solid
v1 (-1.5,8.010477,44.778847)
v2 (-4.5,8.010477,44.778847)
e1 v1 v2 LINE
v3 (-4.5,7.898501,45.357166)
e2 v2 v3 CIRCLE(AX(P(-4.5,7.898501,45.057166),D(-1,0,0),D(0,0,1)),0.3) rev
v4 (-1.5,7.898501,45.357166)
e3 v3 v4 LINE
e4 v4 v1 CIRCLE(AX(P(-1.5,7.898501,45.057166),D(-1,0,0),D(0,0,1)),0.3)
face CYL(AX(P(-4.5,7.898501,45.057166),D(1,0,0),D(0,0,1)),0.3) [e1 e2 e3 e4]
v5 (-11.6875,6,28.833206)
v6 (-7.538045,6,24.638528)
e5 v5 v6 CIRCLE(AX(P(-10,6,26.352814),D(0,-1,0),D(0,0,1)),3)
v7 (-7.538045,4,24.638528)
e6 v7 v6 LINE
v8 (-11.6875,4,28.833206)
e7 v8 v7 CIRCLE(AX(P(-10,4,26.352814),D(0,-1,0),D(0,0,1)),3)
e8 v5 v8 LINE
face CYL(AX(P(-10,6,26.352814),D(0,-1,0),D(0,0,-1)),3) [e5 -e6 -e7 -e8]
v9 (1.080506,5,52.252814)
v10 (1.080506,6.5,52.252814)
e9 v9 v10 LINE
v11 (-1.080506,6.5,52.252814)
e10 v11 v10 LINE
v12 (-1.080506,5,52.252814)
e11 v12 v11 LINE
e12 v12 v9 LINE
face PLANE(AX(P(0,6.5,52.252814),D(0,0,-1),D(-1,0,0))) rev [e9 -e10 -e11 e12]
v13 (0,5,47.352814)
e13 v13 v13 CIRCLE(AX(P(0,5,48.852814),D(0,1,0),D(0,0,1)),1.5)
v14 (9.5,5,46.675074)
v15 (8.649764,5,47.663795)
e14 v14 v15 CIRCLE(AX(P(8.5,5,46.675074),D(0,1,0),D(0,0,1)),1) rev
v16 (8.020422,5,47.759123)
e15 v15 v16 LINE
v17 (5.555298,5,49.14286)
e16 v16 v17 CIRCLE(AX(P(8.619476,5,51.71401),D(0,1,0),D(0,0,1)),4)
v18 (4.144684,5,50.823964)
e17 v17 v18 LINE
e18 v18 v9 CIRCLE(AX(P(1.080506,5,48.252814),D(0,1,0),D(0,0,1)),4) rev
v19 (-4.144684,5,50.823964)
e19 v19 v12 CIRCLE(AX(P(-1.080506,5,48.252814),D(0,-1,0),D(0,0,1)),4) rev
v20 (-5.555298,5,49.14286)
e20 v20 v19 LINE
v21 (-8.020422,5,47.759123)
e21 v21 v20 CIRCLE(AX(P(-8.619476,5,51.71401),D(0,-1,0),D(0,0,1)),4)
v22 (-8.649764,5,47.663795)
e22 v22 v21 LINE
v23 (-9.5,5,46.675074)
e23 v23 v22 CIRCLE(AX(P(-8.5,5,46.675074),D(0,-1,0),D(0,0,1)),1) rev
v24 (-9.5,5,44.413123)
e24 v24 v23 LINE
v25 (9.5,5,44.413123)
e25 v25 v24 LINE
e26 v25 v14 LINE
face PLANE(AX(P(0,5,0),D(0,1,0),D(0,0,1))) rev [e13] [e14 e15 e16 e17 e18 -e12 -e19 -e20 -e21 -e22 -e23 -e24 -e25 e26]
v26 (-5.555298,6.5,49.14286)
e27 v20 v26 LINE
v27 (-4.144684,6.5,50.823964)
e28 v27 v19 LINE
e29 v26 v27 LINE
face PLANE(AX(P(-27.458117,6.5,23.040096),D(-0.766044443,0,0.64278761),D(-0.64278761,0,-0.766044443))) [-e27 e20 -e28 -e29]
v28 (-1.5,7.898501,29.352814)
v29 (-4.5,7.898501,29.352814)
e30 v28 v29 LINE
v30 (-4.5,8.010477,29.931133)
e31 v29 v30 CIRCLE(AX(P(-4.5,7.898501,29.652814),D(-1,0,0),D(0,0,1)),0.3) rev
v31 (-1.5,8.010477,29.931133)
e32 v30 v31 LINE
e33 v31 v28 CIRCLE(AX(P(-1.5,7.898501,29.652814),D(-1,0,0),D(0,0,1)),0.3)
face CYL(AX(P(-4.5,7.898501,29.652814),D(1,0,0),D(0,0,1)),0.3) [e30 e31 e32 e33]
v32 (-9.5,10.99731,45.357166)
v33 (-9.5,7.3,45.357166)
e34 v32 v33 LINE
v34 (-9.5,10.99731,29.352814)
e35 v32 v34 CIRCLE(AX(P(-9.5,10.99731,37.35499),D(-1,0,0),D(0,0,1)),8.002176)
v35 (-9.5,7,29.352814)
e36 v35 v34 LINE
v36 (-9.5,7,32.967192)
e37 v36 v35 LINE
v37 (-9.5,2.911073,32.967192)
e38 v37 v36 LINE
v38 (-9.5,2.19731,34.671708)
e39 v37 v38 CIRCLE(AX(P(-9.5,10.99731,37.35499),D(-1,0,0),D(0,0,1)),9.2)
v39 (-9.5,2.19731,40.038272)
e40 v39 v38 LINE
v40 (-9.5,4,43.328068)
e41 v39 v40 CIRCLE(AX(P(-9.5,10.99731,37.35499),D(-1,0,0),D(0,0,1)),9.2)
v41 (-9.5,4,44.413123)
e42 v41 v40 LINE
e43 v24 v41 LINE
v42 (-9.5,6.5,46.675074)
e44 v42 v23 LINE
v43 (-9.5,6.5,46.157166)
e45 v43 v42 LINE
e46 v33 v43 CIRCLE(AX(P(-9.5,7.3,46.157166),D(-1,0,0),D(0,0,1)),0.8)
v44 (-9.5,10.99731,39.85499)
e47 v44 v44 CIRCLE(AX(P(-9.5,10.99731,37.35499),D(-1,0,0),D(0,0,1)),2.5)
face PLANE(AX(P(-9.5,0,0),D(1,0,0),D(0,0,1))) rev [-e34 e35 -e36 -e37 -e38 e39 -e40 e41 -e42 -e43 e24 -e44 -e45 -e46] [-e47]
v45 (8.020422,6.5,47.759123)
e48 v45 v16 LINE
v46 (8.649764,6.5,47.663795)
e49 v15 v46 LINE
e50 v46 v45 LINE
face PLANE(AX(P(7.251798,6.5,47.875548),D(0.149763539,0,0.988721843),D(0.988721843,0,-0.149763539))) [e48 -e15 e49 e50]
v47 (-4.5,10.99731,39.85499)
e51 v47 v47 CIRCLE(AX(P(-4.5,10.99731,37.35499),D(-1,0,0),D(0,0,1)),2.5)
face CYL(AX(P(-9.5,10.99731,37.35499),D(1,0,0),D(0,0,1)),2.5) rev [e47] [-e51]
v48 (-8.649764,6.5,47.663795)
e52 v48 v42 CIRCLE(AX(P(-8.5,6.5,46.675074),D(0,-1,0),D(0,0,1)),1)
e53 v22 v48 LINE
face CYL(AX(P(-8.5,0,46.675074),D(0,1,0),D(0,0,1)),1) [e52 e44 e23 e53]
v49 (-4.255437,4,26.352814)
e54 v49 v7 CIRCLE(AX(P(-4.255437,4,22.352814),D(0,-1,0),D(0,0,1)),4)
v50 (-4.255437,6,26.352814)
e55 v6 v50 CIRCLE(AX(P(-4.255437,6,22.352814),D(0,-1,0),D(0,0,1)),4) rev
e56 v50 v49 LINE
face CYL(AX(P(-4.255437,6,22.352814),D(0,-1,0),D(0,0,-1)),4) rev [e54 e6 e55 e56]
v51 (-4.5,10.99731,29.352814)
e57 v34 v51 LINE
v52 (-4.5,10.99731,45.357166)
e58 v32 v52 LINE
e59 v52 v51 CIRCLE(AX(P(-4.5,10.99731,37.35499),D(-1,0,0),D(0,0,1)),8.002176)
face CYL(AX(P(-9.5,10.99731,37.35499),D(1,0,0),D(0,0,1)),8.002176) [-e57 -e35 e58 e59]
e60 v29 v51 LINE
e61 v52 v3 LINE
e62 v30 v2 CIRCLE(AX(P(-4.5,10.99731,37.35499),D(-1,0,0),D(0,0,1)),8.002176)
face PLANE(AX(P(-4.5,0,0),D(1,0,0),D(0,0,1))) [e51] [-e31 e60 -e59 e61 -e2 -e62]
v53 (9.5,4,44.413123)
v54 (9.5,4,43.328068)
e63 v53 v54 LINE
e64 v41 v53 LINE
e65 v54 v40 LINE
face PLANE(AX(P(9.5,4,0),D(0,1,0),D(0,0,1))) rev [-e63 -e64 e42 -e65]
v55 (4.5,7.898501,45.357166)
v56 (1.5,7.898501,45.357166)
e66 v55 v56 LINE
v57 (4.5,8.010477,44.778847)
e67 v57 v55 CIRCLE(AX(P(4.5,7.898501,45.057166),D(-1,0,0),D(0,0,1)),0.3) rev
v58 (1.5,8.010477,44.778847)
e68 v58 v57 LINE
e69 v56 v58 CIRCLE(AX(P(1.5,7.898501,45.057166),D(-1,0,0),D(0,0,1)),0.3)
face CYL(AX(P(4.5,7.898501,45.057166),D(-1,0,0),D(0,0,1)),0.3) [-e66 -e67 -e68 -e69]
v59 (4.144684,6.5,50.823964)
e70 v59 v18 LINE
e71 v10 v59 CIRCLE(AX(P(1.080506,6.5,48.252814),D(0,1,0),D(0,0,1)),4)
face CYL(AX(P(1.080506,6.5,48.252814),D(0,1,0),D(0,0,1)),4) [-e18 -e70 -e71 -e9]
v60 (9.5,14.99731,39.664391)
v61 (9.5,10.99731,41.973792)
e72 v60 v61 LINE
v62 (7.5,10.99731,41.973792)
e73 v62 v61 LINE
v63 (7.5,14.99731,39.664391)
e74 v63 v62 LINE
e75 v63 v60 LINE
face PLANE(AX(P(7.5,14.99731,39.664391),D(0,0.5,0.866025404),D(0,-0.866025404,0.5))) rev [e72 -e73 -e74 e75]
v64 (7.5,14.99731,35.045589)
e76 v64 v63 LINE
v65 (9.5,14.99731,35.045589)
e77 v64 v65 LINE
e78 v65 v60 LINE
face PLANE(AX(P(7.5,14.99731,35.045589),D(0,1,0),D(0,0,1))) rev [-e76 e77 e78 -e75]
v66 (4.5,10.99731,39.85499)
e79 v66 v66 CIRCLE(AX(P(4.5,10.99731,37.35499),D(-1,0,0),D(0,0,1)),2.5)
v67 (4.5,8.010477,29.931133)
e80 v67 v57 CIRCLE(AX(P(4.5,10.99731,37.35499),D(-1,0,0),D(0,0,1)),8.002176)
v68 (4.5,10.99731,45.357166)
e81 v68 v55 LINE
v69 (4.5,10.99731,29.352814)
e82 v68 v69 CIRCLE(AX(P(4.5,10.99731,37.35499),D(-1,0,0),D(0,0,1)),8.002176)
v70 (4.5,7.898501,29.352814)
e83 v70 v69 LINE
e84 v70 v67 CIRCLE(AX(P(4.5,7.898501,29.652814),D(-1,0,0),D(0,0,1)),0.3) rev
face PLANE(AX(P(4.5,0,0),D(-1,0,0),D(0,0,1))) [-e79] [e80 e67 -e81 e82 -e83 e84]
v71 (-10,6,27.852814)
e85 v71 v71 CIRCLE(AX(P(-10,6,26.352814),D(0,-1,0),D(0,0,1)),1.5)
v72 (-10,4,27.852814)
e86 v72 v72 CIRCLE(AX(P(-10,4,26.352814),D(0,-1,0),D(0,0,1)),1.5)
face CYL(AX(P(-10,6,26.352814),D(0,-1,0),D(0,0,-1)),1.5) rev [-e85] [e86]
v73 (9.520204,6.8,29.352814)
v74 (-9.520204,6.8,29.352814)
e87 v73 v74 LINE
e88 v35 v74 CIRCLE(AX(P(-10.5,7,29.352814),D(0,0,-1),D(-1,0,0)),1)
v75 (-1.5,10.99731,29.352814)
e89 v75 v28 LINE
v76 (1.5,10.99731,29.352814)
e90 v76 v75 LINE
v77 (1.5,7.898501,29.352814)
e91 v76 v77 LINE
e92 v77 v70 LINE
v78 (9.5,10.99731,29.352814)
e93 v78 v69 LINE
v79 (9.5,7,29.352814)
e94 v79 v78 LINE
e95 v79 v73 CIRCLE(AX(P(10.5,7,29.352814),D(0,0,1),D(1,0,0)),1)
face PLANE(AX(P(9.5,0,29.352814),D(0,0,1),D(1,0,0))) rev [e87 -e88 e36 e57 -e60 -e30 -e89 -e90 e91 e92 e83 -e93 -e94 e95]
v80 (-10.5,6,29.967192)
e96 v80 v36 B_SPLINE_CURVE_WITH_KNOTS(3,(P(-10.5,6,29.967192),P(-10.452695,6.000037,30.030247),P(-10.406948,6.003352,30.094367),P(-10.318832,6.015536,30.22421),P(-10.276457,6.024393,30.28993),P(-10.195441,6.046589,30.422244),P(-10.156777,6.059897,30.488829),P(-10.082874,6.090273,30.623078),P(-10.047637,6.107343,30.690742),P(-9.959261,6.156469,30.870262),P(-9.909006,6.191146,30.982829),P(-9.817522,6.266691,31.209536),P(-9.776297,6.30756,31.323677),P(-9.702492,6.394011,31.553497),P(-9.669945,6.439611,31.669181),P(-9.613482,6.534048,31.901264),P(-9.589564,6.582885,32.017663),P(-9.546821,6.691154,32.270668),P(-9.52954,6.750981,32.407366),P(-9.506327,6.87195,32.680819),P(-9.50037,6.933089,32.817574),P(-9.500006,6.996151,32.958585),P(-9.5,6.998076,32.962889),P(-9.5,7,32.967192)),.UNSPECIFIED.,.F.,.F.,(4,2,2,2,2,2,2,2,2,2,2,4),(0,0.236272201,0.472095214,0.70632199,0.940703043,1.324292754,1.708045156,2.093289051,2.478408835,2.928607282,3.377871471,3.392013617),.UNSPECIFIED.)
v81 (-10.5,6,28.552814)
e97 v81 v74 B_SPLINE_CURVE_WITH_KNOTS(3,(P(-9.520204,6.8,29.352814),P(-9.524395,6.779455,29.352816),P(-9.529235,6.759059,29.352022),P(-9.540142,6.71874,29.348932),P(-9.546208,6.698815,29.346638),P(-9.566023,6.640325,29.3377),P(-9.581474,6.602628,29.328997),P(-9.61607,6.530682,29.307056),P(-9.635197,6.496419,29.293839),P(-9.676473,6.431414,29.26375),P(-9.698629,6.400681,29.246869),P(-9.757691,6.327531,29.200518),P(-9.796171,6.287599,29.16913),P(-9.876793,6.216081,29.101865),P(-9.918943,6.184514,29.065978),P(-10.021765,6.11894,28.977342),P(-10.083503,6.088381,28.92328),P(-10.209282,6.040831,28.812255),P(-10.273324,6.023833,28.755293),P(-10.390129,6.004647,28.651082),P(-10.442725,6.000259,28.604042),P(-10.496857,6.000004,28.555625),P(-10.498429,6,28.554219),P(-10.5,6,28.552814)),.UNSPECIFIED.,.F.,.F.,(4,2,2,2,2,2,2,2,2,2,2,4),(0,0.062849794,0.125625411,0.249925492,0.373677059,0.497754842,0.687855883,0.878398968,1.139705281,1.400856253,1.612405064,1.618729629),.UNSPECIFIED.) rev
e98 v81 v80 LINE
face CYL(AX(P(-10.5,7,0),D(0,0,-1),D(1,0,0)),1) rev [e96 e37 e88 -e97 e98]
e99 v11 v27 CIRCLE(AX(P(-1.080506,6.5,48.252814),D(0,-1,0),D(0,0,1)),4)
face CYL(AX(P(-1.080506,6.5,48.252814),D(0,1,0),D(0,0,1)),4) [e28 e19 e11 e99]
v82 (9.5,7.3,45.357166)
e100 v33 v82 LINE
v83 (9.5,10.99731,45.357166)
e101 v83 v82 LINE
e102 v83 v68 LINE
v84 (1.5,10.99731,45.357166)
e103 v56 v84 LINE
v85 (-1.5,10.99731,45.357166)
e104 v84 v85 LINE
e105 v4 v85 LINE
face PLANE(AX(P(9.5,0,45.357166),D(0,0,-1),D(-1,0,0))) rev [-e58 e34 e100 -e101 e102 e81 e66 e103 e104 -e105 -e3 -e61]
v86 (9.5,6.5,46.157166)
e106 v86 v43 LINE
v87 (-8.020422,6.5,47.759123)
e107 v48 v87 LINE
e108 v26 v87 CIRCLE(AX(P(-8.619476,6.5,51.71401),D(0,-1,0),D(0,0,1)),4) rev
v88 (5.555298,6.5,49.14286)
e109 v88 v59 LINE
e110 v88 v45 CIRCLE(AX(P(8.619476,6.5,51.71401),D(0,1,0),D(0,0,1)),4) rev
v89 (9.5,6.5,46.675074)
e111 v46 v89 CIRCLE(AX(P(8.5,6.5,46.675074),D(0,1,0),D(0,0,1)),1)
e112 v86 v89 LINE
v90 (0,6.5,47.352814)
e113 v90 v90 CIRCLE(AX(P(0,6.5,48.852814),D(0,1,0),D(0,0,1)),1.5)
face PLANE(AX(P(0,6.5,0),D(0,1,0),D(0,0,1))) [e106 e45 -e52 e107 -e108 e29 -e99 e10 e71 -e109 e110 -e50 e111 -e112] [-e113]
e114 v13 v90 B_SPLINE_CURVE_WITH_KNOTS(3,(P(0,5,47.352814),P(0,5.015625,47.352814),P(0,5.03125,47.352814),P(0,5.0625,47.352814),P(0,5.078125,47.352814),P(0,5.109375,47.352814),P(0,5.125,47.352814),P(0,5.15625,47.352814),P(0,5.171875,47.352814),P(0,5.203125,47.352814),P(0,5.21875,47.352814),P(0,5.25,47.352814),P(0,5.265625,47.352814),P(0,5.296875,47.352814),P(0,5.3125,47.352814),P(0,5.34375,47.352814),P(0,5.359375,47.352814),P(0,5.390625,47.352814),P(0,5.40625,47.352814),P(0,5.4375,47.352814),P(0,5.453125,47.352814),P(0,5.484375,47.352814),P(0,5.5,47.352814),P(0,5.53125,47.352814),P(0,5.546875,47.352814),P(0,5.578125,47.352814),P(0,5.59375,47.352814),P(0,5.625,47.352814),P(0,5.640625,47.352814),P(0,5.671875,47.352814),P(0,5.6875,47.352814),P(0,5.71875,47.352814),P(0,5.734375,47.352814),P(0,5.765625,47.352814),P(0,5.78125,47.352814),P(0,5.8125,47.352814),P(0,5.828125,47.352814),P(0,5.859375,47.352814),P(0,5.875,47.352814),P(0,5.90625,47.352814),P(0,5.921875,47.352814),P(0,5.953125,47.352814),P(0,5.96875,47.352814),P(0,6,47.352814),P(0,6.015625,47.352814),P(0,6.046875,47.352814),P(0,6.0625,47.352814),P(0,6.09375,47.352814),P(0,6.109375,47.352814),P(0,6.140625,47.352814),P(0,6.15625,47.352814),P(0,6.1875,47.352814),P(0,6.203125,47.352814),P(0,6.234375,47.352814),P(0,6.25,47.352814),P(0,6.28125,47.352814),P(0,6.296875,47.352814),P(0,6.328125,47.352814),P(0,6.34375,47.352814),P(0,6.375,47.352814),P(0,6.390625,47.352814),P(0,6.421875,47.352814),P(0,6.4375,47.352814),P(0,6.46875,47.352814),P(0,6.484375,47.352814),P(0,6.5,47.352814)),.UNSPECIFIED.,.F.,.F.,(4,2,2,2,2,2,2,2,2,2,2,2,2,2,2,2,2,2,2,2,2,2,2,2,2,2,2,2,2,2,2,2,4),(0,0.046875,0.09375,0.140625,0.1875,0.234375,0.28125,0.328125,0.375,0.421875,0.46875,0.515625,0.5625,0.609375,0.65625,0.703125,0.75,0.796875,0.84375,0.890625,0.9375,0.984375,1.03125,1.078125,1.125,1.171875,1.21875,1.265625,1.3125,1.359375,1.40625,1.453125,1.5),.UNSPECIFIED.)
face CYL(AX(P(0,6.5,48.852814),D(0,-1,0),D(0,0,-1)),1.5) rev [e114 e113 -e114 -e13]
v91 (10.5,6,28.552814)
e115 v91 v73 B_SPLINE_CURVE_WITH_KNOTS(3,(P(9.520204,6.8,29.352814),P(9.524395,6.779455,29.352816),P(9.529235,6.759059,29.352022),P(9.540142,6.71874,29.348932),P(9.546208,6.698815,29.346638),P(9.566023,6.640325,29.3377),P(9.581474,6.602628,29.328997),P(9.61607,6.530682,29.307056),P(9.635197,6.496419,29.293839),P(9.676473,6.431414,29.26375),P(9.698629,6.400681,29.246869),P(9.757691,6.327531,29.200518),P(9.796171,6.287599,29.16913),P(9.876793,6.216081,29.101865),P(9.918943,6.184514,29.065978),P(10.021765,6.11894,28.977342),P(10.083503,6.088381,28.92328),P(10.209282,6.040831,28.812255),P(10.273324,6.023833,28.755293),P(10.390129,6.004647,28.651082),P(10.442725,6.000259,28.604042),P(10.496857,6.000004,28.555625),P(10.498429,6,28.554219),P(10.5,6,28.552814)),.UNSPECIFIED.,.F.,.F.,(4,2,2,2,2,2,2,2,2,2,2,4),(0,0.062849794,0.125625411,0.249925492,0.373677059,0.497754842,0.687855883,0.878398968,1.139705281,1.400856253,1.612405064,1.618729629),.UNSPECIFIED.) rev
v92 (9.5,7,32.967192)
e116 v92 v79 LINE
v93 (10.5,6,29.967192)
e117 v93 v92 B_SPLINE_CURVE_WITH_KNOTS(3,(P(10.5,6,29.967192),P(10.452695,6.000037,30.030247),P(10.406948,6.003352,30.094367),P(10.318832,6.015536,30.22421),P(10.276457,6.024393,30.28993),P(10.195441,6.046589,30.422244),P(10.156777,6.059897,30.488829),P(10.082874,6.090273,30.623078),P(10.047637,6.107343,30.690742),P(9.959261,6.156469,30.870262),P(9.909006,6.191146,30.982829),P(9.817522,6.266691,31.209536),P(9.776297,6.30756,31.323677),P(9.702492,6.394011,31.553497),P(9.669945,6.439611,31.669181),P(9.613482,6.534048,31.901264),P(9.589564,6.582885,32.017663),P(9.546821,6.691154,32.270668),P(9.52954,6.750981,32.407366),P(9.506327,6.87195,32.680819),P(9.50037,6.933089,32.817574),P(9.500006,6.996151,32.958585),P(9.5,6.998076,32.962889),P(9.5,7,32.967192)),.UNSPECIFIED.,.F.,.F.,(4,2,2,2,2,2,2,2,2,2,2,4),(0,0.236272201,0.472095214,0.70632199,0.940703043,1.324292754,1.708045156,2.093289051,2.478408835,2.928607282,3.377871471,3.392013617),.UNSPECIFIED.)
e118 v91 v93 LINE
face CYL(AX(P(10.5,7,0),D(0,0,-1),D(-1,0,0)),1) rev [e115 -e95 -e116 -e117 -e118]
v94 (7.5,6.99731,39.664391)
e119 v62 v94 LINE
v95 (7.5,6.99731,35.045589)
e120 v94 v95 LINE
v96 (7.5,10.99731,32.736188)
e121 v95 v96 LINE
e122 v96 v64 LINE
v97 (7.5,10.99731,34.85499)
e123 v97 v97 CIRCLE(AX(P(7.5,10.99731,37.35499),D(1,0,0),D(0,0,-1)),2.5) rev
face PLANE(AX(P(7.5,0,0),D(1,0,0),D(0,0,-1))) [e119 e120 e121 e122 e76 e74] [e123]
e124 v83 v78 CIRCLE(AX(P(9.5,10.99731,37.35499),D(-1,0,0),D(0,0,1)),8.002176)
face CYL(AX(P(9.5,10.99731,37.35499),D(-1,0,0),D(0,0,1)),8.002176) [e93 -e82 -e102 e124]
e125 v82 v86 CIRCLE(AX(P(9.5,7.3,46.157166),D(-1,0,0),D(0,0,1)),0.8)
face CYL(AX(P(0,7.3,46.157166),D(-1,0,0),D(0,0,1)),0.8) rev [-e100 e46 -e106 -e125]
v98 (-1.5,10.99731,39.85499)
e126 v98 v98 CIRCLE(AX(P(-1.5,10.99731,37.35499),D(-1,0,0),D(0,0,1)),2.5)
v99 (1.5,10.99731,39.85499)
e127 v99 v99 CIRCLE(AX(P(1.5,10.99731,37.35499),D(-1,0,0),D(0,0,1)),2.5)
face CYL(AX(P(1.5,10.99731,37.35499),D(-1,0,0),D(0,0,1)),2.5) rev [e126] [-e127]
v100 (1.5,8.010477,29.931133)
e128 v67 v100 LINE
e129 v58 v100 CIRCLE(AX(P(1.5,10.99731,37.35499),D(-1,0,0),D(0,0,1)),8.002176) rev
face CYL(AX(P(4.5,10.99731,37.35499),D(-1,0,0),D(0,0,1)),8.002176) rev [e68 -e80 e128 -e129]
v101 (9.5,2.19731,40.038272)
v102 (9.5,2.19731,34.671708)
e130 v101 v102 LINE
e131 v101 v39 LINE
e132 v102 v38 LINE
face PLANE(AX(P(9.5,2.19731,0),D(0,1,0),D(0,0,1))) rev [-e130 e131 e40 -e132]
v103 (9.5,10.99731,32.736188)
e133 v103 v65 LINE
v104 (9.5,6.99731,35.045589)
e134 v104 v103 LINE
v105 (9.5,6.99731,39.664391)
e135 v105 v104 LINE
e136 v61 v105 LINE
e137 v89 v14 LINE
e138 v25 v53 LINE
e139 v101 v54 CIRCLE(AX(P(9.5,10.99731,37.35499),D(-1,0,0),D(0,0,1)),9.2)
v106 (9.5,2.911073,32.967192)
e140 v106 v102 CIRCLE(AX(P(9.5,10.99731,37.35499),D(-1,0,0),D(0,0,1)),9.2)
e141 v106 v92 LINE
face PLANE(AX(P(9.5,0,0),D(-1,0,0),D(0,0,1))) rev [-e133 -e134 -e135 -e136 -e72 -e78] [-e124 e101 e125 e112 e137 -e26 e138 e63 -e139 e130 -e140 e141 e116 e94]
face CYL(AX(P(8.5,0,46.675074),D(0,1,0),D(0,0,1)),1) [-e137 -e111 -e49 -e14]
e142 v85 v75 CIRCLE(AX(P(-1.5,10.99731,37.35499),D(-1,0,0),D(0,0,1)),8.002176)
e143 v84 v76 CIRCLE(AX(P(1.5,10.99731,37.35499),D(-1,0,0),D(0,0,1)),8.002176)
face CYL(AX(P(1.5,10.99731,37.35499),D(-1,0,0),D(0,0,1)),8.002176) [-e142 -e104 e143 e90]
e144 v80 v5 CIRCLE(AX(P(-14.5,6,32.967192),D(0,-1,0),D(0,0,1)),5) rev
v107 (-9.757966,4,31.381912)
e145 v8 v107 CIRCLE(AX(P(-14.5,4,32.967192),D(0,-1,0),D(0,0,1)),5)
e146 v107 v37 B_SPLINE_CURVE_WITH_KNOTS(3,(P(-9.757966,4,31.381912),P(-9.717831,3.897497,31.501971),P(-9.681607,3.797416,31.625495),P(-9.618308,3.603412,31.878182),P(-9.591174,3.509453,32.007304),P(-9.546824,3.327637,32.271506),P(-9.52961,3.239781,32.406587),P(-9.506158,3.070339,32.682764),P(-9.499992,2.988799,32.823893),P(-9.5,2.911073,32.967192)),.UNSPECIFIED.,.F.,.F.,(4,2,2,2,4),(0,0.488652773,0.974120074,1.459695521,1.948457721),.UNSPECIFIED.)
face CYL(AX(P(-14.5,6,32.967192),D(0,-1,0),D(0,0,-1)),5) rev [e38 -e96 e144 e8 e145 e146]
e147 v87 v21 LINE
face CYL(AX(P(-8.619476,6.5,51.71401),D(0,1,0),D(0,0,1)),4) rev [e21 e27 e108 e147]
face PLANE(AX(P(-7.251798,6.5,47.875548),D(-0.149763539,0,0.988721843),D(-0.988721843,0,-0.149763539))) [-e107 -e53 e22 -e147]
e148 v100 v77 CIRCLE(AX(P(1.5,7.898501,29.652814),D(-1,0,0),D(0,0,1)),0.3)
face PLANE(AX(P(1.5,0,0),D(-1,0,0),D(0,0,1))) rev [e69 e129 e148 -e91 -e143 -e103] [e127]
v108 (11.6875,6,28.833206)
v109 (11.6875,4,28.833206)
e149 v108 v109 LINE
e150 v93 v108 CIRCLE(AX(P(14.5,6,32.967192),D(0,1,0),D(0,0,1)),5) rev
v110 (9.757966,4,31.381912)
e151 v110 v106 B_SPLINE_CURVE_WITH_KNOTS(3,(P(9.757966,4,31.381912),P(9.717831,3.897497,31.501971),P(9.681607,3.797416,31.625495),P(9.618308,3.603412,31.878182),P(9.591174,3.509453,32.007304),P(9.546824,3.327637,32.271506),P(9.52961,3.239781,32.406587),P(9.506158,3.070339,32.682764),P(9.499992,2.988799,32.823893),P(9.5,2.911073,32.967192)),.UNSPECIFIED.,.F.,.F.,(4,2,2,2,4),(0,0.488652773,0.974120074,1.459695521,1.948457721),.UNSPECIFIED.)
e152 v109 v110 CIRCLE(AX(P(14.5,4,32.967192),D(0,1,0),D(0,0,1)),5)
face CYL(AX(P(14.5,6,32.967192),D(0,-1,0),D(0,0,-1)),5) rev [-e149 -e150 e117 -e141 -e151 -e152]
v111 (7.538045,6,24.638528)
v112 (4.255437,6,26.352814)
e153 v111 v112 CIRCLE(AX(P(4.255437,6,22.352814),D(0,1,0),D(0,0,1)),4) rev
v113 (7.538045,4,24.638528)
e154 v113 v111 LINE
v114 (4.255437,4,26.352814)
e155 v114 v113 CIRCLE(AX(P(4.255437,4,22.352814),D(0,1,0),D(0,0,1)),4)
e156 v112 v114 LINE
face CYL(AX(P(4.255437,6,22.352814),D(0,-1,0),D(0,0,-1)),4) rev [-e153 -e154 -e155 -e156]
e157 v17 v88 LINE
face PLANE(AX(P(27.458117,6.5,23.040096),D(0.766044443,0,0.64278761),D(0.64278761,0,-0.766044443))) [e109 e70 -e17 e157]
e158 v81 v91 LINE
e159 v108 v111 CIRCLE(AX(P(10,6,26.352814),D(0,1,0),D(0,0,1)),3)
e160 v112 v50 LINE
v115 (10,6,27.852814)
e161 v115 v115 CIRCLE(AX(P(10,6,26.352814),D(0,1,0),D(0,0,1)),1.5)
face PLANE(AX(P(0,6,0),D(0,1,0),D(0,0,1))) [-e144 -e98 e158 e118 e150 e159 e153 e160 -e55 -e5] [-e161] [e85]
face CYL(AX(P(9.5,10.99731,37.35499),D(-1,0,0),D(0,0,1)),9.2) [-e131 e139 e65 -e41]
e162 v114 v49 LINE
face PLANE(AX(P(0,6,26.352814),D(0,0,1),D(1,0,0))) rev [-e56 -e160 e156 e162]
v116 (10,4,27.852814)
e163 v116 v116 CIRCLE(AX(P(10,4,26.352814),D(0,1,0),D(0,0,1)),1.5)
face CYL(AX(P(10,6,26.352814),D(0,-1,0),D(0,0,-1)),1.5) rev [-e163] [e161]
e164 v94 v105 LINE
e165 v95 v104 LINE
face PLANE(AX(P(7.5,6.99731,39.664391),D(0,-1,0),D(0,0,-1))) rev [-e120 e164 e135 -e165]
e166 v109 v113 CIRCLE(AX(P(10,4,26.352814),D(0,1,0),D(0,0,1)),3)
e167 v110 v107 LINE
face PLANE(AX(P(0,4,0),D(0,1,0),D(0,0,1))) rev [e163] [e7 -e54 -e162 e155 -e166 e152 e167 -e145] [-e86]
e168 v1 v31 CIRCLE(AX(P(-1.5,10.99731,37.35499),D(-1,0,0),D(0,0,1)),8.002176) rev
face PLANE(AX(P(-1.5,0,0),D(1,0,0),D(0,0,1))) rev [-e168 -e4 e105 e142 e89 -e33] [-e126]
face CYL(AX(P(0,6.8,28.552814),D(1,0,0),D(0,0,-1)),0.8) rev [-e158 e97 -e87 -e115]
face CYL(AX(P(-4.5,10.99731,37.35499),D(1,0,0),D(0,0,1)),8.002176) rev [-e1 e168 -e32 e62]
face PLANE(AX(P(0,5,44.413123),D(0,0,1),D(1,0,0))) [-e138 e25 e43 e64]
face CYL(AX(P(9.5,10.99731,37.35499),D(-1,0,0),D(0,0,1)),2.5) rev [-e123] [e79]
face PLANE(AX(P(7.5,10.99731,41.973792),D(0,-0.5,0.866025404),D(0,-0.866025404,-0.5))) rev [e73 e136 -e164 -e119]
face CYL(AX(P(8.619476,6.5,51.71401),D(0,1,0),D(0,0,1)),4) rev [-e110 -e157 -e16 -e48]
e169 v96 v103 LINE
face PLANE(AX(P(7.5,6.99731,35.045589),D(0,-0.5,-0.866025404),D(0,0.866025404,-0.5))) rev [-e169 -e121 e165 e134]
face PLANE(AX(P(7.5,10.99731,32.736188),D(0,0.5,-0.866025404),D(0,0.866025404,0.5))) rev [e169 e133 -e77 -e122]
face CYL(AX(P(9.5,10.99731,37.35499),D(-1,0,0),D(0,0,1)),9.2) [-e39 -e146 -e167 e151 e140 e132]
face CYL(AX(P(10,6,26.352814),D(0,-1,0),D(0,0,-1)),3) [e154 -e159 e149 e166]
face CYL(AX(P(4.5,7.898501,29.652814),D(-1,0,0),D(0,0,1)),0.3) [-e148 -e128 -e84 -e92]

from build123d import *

# Parameters (mm, degrees)
EXTRUDE_1_DEPTH     = 6.5
SKETCH_1_7_R        = 1.5000000000000009
EXTRUDE_2_DEPTH     = 6
SKETCH_1_5_R        = 1.5000000000000009
CUT_EXTRUDE_1_DEPTH = 4
SKETCH_4_R          = 2.5000000000000018
EXTRUDE_3_DEPTH     = 9.5
SKETCH_4_3_R        = 8.002176317228214
CUT_EXTRUDE_3_DEPTH = 4.5
SKETCH_4_4_R        = 8.002176317228214
SKETCH_4_4_R_2      = 2.5000000000000018
EXTRUDE_4_DEPTH     = 1.5
CUT_EXTRUDE_7_DEPTH = 5
FILLET_10_R         = 5
FILLET_12_R         = 1
FILLET_8_R          = 4
FILLET_15_R         = 4
FILLET_14_R         = 0.8
FILLET_START        = 1.5
FILLET_16_DEPTH     = 3
CUT_EXTRUDE_8_DEPTH = 2


with BuildPart() as part:
    # 草图1 → 凸台-拉伸1 (new body)
    with BuildSketch(Plane(origin=(0, 0, 0), x_dir=(1, 0, 0), z_dir=(0, 1, 0))):
        with BuildLine():
            Line((6.526515759031646, -47.98540773429276), (9.500000000000004, -47.53500853797252))
            Line((9.5, -47.53500853797252), (9.5, -44.41312259021298))
            Line((9.5, -44.41312259021298), (-3.197e-14, -44.41312259021298))
            Line((-3.234e-14, -44.41312259021298), (-3.819e-14, -47.352813742384996))
            ThreePointArc((-3.795e-14, -47.352813742384996), (1.4999999999999172, -48.852813742385), (-6.167e-14, -50.35281374238498))
            Line((-6.167e-14, -50.35281374238498), (5e-17, -52.25281374238501))
            Line((5e-17, -52.25281374238501), (2.945736951557686, -52.25281374238501))
            Line((2.9457369515576866, -52.25281374238501), (6.52651575903164, -47.98540773429274))
        make_face()
    extrude(amount=EXTRUDE_1_DEPTH)

    # 草图1<7> → 凸台-拉伸2 (add)
    # profile 1 of 2: a face of its own
    with BuildSketch(Plane(origin=(0, 0, 0), x_dir=(1, 0, 0), z_dir=(0, 1, 0))):
        with BuildLine():
            Line((6.52651575903165, -47.98540773429276), (9.500000000000004, -47.53500853797252))
            Line((9.5, -47.53500853797252), (9.5, -44.41312259021298))
            Line((9.5, -44.41312259021298), (2.9999616443939274, -44.41312259021298))
            Line((2.9999616443939274, -44.41312259021298), (-3.197e-14, -44.41312259021298))
            Line((-3.234e-14, -44.41312259021298), (-3.532e-14, -45.852813742384946))
            ThreePointArc((-3.498e-14, -45.852813742384946), (2.001072491845667, -46.61770549391504), (2.981742421540369, -48.52234115413275))
            Line((2.981742421540467, -48.52234115413273), (6.52651575903165, -47.98540773429276))
        make_face()
    # profile 2 of 2: a face of its own
    with BuildSketch(Plane(origin=(0, 0, 0), x_dir=(1, 0, 0), z_dir=(0, 1, 0))):
        with BuildLine():
            Line((0, -29.352813742384996), (9.999999999999913, -29.352813742384996))
            ThreePointArc((9.999999999999913, -29.352813742384996), (12.121320343559674, -24.231493398825386), (7, -26.352813742384992))
            Line((6.999999999999999, -26.352813742384996), (-4.796e-14, -26.352813742384996))
            Line((0, -26.352813742384996), (0, -29.352813742384996))
        make_face()
        with Locations(Location((9.999999999999998, -26.352813742384996, 0), (0, 0, 270))):
            Circle(SKETCH_1_7_R, mode=Mode.SUBTRACT)
    extrude(amount=EXTRUDE_2_DEPTH)


with BuildPart() as extrude_2_piece_1:
    # of the separate pieces the step leaves, piece 1, a body of its own (extrude_2_pieces)
    add(part.part.solids().sort_by_distance((6.526515759, 0, 47.985407734))[0])


with BuildPart() as extrude_2_piece_2:
    # of the separate pieces the step leaves, piece 2, a body of its own (extrude_2_pieces)
    add(part.part.solids().sort_by_distance((0, 0, 26.352813742))[0])


with BuildPart() as cut_extrude_1_tool:
    # 草图1<5> → 切除-拉伸1 (new body)
    # profile 1 of 3: a face of its own
    with BuildSketch(Plane(origin=(0, 0, 0), x_dir=(1, 0, 0), z_dir=(0, 1, 0))):
        with BuildLine():
            ThreePointArc((1.232e-14, -51.85281374238499), (2.2351082484699845, -50.85388623423072), (2.9817424215404666, -48.52234115413273))
            ThreePointArc((2.981742421540369, -48.52234115413275), (2.001072491845667, -46.61770549391504), (-3.498e-14, -45.852813742384946))
            Line((-3.532e-14, -45.852813742384946), (-3.843e-14, -47.352813742384996))
            ThreePointArc((-3.795e-14, -47.352813742384996), (1.4999999999999172, -48.852813742385), (-6.167e-14, -50.35281374238498))
            Line((-6.167e-14, -50.35281374238498), (1.27e-14, -51.85281374238499))
        make_face()
    # profile 2 of 3: a face of its own
    with BuildSketch(Plane(origin=(0, 0, 0), x_dir=(1, 0, 0), z_dir=(0, 1, 0))):
        with BuildLine():
            Line((6.52651575903165, -47.98540773429276), (9.500000000000004, -47.53500853797252))
            Line((9.5, -47.53500853797252), (9.5, -44.41312259021298))
            Line((9.5, -44.41312259021298), (2.9999616443939274, -44.41312259021298))
            Line((2.9999616443939274, -44.41312259021298), (-3.197e-14, -44.41312259021298))
            Line((-3.234e-14, -44.41312259021298), (-3.532e-14, -45.852813742384946))
            ThreePointArc((-3.498e-14, -45.852813742384946), (2.001072491845667, -46.61770549391504), (2.981742421540369, -48.52234115413275))
            Line((2.981742421540467, -48.52234115413273), (6.52651575903165, -47.98540773429276))
        make_face()
    # profile 3 of 3: a face of its own
    with BuildSketch(Plane(origin=(0, 0, 0), x_dir=(1, 0, 0), z_dir=(0, 1, 0))):
        with BuildLine():
            Line((0, -29.352813742384996), (9.999999999999913, -29.352813742384996))
            ThreePointArc((9.999999999999913, -29.352813742384996), (12.121320343559674, -24.231493398825386), (7, -26.352813742384992))
            Line((6.999999999999999, -26.352813742384996), (-4.796e-14, -26.352813742384996))
            Line((0, -26.352813742384996), (0, -29.352813742384996))
        make_face()
        with Locations(Location((9.999999999999998, -26.352813742384996, 0), (0, 0, 270))):
            Circle(SKETCH_1_5_R, mode=Mode.SUBTRACT)
    extrude(amount=CUT_EXTRUDE_1_DEPTH)


with BuildPart() as extrude_2_piece_1_1:
    add(extrude_2_piece_1.part)

    # 切除-拉伸1: cut by cut_extrude_1_tool
    add(cut_extrude_1_tool.part, mode=Mode.SUBTRACT)



with BuildPart() as extrude_2_piece_2_1:
    add(extrude_2_piece_2.part)

    # 切除-拉伸1: cut by cut_extrude_1_tool
    add(cut_extrude_1_tool.part, mode=Mode.SUBTRACT)


with BuildPart() as extrude_2_piece_1_2:
    add(extrude_2_piece_1_1.part)

    add(extrude_2_piece_2_1.part)  # 凸台-拉伸3 merges 凸台-拉伸2 piece 2
    # 草图4 → 凸台-拉伸3 (add)
    with BuildSketch(Plane.ZY):
        with BuildLine():
            Line((43.32806789988807, 4), (44.41312259021298, 4))
            Line((44.41312259021298, 4), (44.41312259021298, 6.5))
            Line((44.41312259021298, 6.5), (45.35716637684143, 6.5))
            Line((45.35716637684143, 6.5), (45.35716637684143, 10.99730956254026))
            ThreePointArc((45.35716637684142, 10.99730956254026), (37.35499005961321, 18.99948587976847), (29.352813742384996, 10.997309562540261))
            Line((29.352813742384996, 10.99730956254026), (29.352813742384996, 4))
            Line((29.352813742384996, 4), (31.381912219338343, 4))
            ThreePointArc((31.381912219338343, 3.9999999999999982), (32.93395366796542, 2.929197191996211), (34.67170848661348, 2.1973095625402532))
            Line((34.67170848661348, 2.1973095625402554), (40.03827163261293, 2.1973095625402554))
            ThreePointArc((40.03827163261293, 2.1973095625402532), (41.776026451261, 2.929197191996213), (43.32806789988807, 4))
        make_face()
        with Locations((37.35499005961321, 10.99730956254026)):
            Circle(SKETCH_4_R, mode=Mode.SUBTRACT)
    extrude(amount=-EXTRUDE_3_DEPTH)

    # 草图4<3> → 切除-拉伸3 (cut)
    with BuildSketch(Plane.ZY):
        with Locations((37.35499005961321, 10.99730956254026)):
            Circle(SKETCH_4_3_R)
    extrude(amount=-CUT_EXTRUDE_3_DEPTH, mode=Mode.SUBTRACT)

    # 草图4<4> → 凸台-拉伸4 (add)
    with BuildSketch(Plane.ZY):
        with Locations((37.35499005961321, 10.99730956254026)):
            Circle(SKETCH_4_4_R)
        with Locations((37.35499005961321, 10.99730956254026)):
            Circle(SKETCH_4_4_R_2, mode=Mode.SUBTRACT)
    extrude(amount=-EXTRUDE_4_DEPTH)

    # 草图1<8> → 切除-拉伸7 (cut)
    with BuildSketch(Plane(origin=(0, 0, 0), x_dir=(1, 0, 0), z_dir=(0, 1, 0))):
        with BuildLine():
            Line((6.52651575903165, -47.98540773429276), (9.500000000000004, -47.53500853797252))
            Line((9.5, -47.53500853797252), (9.5, -44.41312259021298))
            Line((9.5, -44.41312259021298), (2.9999616443939274, -44.41312259021298))
            Line((2.9999616443939274, -44.41312259021298), (-3.197e-14, -44.41312259021298))
            Line((-3.234e-14, -44.41312259021298), (-3.532e-14, -45.852813742384946))
            ThreePointArc((-3.365e-14, -45.852813742384946), (2.001072491845667, -46.61770549391504), (2.9817424215403685, -48.52234115413274))
            Line((2.981742421540467, -48.52234115413273), (6.52651575903165, -47.98540773429276))
        make_face()
        with BuildLine():
            ThreePointArc((1.232e-14, -51.85281374238499), (2.2351082484699845, -50.85388623423072), (2.9817424215404666, -48.52234115413273))
            ThreePointArc((2.981742421540369, -48.52234115413275), (2.001072491845667, -46.61770549391504), (-3.498e-14, -45.852813742384946))
            Line((-3.532e-14, -45.852813742384946), (-3.843e-14, -47.352813742384996))
            ThreePointArc((-3.795e-14, -47.352813742384996), (1.4999999999999172, -48.852813742385), (-6.167e-14, -50.35281374238498))
            Line((-6.167e-14, -50.35281374238498), (1.27e-14, -51.85281374238499))
        make_face()
        with BuildLine():
            Line((2.9457369515576866, -52.25281374238501), (6.52651575903164, -47.98540773429274))
            Line((6.52651575903165, -47.98540773429276), (2.981742421540467, -48.52234115413273))
            ThreePointArc((2.9817424215404666, -48.52234115413273), (2.2351082484699845, -50.85388623423072), (1.232e-14, -51.85281374238499))
            Line((1.27e-14, -51.85281374238499), (5e-17, -52.25281374238501))
            Line((5e-17, -52.25281374238501), (2.945736951557686, -52.25281374238501))
        make_face()
    extrude(amount=CUT_EXTRUDE_7_DEPTH, mode=Mode.SUBTRACT)

    # 圆角10
    # the kernel refuses this fillet: 5 mm, written as the material it adds along each edge
    with BuildSketch(Plane(origin=(9.5, 6, 29.352813742384996), x_dir=(0, 0, 1), z_dir=(0, -1, 0))) as fillet_10_piece_1:
        with BuildLine():
            CenterArc((3.614378277661473, -5), FILLET_10_R, 90, 55.77113367218743)
            Line((-0.5196081458769513, -2.1875), (-0.9330067882307951, -1.90625))
            ThreePointArc((-0.9330067882307951, -1.90625), (-0.5, -0.49999999999992717), (-0.5, 0))
            Line((-0.5, 0), (0, 0.5))
            Line((0, 0.5), (3.614378277661473, 0.5))
            Line((3.614378277661473, 0.5), (3.614378277661473, 0))
        make_face()
    extrude(amount=2)
    with BuildSketch(Plane(origin=(9.5, 6, 29.352813742384996), x_dir=(0, 0, 1), z_dir=(0, -1, 0))) as fillet_10_piece_2_section:
        with BuildLine():
            CenterArc((3.614378277661473, -5), FILLET_10_R, 90, 55.77113367218743)
            Line((-0.5196081458769513, -2.1875), (-0.9330067882307951, -1.90625))
            ThreePointArc((-0.9330067882307951, -1.90625), (-0.5, -0.49999999999992717), (-0.5, 0))
            Line((-0.5, 0), (0, 0.5))
            Line((0, 0.5), (3.614378277661473, 0.5))
            Line((3.614378277661473, 0.5), (3.614378277661473, 0))
        make_face()
    fillet_10_piece_2 = extrude(amount=11.035945694153682, mode=Mode.PRIVATE)
    fillet_10_piece_2 = fillet_10_piece_2 & Plane(origin=(9.5, 10.997309562540337, 37.35499005961324), x_dir=(0, -0.7605771263630735, -0.6492475913342225), z_dir=(-1, 0, 0)) * Cylinder(9.200000000000085, 37, mode=Mode.PRIVATE)
    add(fillet_10_piece_2)

    # 圆角12
    fillet_12_edges = [extrude_2_piece_1_2.edges().sort_by_distance(p)[0] for p in [
        (9.5, 6, 31.160002881215497),
        (9.500000000000002, 5.75, 47.53500853797252),
    ]]
    fillet(fillet_12_edges, radius=FILLET_12_R)

    # 圆角8
    fillet_8_edges = [extrude_2_piece_1_2.edges().sort_by_distance(p)[0] for p in [
        (2.945736951557686, 5.75, 52.25281374238501),
        (6.526515759031643, 5.75, 47.98540773429275),
    ]]
    fillet(fillet_8_edges, radius=FILLET_8_R)

    # 圆角15
    fillet_15_edges = [extrude_2_piece_1_2.edges().sort_by_distance(p)[0] for p in [
        (7, 5, 26.352813742384996),
    ]]
    fillet(fillet_15_edges, radius=FILLET_15_R)

    # 圆角14
    fillet_14_edges = [extrude_2_piece_1_2.edges().sort_by_distance(p)[0] for p in [
        (5.25, 6, 29.352813742384996),
        (4.75, 6.5, 45.35716637684143),
    ]]
    fillet(fillet_14_edges, radius=FILLET_14_R)

    # 圆角16: read off the stored shape, not the designer's step
    # 圆角16 outline → 圆角16 (cut)
    with BuildSketch(Plane.YZ.offset(FILLET_START)):
        with BuildLine():
            ThreePointArc((10.997309563, 29.352813742), (9.476157021, 29.498723722), (8.010477223, 29.93113268))
            ThreePointArc((8.010477223, 29.93113268), (8.193031336, 29.595786035), (7.898501472, 29.352813742))
            Line((7.898501472, 29.352813742), (10.997309563, 29.352813742))
        make_face()
        with BuildLine():
            ThreePointArc((7.898501472, 45.357166377), (8.193031336, 45.114194084), (8.010477223, 44.778847439))
            ThreePointArc((8.010477223, 44.778847439), (9.476157021, 45.211256397), (10.997309563, 45.357166377))
            Line((10.997309563, 45.357166377), (7.898501472, 45.357166377))
        make_face()
    extrude(amount=FILLET_16_DEPTH, mode=Mode.SUBTRACT)

    # 镜向1: 凸台-拉伸2 piece 1 across plane


with BuildPart() as extrude_2_piece_1_3:
    add(extrude_2_piece_1_2.part)
    add(extrude_2_piece_1_2.part.mirror(Plane(origin=(0, 6, 0), x_dir=(0, 0, 1), z_dir=(-1, 0, 0))))

    # 草图5 → 切除-拉伸8 (cut)
    with BuildSketch(Plane(origin=(9.5, 0, 0), x_dir=(0, 0, -1), z_dir=(1, 0, 0))):
        Polygon((-41.97379221313022, 10.997309562540254), (-39.66439113637171, 6.9973095625402575), (-35.0455889828547, 6.997309562540257), (-32.7361879060962, 10.997309562540261), (-35.0455889828547, 14.997309562540265), (-39.664391136371705, 14.997309562540265), align=None)
    extrude(amount=-CUT_EXTRUDE_8_DEPTH, mode=Mode.SUBTRACT)


solid = extrude_2_piece_1_3.part
